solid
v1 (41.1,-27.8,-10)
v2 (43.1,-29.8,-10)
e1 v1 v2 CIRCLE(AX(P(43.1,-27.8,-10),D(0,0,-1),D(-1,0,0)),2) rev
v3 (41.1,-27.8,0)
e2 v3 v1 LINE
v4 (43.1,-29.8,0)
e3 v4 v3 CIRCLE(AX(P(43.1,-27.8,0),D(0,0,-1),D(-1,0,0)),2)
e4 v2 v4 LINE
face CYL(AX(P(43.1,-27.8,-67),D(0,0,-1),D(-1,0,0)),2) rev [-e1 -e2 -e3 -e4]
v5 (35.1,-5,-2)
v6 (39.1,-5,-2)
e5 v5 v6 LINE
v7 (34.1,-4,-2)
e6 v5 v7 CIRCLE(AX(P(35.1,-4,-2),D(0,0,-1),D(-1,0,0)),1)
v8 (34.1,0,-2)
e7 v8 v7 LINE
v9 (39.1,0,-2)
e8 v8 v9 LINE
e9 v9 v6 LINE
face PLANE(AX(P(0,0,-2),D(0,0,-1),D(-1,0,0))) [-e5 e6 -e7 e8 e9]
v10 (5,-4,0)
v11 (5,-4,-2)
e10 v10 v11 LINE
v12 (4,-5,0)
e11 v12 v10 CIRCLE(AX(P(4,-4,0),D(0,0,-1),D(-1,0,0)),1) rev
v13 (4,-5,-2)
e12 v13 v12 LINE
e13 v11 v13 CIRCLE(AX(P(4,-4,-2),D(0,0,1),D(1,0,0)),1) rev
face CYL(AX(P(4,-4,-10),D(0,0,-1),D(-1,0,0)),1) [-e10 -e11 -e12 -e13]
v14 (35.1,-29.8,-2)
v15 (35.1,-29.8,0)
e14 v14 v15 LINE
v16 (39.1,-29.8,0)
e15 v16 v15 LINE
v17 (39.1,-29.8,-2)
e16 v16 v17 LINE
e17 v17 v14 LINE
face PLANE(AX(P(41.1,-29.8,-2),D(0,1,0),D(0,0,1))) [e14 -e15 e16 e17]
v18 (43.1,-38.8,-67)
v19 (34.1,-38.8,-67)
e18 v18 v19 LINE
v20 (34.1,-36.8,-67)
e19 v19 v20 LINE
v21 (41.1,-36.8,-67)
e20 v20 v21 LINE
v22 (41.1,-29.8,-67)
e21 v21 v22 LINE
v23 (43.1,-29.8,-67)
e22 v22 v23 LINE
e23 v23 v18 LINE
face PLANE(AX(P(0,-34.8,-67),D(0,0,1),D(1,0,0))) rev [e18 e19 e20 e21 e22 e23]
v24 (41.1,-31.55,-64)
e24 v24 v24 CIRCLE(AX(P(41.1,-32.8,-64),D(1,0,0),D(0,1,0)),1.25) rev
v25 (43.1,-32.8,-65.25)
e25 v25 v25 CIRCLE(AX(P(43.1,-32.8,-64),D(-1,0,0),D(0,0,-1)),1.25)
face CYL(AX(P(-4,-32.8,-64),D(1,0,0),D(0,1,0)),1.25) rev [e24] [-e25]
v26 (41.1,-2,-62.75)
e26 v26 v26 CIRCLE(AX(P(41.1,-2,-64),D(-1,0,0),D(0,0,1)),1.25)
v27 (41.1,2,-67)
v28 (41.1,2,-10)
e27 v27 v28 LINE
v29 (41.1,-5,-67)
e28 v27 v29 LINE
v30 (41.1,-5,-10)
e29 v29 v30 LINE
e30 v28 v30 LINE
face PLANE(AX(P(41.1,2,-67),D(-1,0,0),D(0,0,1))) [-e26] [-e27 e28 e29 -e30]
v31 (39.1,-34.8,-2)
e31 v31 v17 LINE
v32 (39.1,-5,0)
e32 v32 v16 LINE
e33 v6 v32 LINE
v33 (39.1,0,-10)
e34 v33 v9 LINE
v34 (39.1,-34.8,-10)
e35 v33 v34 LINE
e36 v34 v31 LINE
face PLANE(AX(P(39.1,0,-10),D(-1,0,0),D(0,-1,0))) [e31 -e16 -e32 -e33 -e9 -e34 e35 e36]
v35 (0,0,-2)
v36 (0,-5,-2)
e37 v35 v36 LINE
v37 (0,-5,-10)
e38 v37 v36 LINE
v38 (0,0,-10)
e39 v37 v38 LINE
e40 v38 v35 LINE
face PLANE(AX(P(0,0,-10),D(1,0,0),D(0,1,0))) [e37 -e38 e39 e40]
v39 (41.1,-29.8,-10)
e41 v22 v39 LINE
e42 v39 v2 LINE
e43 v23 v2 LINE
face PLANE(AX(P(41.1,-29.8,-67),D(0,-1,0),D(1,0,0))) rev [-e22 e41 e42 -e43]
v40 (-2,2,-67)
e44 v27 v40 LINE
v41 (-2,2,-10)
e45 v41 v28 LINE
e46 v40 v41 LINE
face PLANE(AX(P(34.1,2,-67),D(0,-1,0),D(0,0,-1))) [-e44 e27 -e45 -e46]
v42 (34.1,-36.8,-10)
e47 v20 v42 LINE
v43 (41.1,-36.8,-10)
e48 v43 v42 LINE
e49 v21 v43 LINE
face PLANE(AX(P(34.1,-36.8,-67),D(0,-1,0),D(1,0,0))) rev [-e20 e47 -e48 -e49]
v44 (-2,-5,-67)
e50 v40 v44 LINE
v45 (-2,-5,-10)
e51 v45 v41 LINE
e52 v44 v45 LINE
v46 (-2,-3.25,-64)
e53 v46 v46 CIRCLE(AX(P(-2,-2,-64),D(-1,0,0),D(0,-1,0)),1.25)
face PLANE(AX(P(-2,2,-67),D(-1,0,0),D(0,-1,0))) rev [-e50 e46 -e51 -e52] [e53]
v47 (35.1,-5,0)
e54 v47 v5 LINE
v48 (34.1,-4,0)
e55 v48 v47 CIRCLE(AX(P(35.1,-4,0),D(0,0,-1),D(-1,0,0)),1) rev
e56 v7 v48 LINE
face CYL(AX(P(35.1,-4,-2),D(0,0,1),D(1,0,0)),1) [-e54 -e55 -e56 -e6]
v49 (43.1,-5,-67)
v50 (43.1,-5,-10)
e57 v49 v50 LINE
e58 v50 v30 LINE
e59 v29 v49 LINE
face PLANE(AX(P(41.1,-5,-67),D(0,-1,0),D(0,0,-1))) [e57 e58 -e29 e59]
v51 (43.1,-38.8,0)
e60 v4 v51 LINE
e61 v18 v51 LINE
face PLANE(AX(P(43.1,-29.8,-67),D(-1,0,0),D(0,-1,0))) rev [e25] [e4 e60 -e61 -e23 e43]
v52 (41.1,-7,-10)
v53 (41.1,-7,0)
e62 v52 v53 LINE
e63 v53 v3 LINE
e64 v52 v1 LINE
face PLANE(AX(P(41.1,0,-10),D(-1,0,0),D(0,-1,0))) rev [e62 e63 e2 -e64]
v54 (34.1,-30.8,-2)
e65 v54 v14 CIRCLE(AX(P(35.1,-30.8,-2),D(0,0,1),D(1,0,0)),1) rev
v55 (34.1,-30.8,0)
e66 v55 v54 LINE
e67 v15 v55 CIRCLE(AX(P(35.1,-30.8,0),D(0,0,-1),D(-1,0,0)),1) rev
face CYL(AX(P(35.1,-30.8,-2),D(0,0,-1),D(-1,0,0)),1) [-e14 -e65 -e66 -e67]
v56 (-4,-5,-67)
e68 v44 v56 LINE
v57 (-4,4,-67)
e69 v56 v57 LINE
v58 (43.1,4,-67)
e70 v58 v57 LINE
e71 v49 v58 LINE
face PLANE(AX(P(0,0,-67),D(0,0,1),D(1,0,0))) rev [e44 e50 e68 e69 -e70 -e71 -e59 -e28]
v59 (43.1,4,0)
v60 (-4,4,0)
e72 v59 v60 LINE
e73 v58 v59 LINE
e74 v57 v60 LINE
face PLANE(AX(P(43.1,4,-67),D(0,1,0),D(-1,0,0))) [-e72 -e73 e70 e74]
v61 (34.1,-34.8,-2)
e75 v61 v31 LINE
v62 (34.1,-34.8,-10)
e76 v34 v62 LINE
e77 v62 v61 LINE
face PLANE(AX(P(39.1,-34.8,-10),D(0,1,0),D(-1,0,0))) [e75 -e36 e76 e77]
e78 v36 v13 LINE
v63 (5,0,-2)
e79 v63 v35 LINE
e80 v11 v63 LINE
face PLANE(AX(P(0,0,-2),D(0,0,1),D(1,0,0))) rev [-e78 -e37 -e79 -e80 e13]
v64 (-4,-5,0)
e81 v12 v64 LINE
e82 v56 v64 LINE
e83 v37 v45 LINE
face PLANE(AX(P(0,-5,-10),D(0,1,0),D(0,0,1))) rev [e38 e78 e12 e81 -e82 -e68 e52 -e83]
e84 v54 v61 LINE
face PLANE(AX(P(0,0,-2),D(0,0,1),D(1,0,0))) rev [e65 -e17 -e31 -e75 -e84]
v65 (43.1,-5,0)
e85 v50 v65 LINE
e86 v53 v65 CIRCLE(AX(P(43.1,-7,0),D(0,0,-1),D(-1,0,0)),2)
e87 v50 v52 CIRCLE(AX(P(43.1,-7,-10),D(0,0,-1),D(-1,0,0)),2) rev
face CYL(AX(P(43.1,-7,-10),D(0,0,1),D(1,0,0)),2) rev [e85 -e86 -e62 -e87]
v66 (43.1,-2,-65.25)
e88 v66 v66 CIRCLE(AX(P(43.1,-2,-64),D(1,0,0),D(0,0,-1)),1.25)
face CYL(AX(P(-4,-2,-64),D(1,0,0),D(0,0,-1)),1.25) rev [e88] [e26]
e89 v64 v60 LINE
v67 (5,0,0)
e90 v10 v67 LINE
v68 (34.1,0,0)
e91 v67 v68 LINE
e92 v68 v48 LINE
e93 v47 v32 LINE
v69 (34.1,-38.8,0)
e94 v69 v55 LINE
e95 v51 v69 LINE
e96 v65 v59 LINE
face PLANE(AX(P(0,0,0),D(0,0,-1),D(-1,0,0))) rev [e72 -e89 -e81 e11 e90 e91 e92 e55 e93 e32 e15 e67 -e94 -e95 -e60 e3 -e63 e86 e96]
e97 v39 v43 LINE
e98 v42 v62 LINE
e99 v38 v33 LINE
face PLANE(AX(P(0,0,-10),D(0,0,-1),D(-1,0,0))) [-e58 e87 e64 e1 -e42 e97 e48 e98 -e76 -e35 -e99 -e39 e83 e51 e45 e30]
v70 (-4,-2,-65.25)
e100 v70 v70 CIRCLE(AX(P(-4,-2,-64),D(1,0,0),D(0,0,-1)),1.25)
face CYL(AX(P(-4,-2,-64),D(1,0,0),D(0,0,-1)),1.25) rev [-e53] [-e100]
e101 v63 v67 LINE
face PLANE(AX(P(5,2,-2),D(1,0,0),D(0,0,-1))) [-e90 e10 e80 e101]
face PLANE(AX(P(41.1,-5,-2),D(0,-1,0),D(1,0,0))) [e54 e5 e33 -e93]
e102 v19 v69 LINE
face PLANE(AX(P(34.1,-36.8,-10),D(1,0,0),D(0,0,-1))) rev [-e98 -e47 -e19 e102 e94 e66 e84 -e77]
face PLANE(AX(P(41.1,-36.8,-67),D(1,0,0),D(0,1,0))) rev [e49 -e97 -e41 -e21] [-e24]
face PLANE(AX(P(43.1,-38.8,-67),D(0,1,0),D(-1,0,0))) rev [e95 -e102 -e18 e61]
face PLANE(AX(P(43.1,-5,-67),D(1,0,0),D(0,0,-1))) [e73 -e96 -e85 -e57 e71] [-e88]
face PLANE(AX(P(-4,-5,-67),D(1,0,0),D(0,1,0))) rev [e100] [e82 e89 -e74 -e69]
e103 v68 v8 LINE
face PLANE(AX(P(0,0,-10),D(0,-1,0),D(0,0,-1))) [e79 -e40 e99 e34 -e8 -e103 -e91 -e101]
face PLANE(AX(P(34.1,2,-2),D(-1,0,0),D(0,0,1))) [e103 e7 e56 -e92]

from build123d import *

# Parameters (mm, degrees)
EXTRUDE_THIN1_DEPTH  = 10
SKETCH2_W            = 7
SKETCH2_H            = 7
BOSS_EXTRUDE1_DEPTH  = 2
FILLET1_R            = 1
BOSS_EXTRUDE2_DEPTH  = 67
SKETCH4_R            = 1.25
CUT_EXTRUDE1_DEPTH   = 91.624775862
FILLET2_R            = 2
MOVE_START           = -67
MOVE_FACE1_OUTLINE_W = 29.1
MOVE_FACE1_OUTLINE_H = 2
MOVE_FACE1_DEPTH     = 67


# Read off the part's stored shape, not the designer's step: Move Face1
with BuildPart() as part:
    # Sketch1 → Extrude-Thin1 (new body)
    with BuildSketch(Plane.XY):
        Polygon((0, -5), (0, 0), (39.1, 0), (39.1, -34.8), (34.1, -34.8), (34.1, -36.8), (41.1, -36.8), (41.1, 2), (-2, 2), (-2, -5), align=None)
    extrude(amount=-EXTRUDE_THIN1_DEPTH)

    # Sketch2 → Boss-Extrude1 (add)
    with BuildSketch(Plane.XY):
        with Locations((1.5, -1.5)):
            Rectangle(SKETCH2_W, SKETCH2_H)
        with Locations((37.6, -1.5)):
            Rectangle(SKETCH2_W, SKETCH2_H)
        with Locations((37.6, -33.3)):
            Rectangle(SKETCH2_W, SKETCH2_H)
    extrude(amount=-BOSS_EXTRUDE1_DEPTH)

    # Fillet1
    fillet1_edges = [part.edges().sort_by_distance(p)[0] for p in [
        (5, -5, -1),
        (34.1, -5, -1),
        (34.1, -29.8, -1),
    ]]
    fillet(fillet1_edges, radius=FILLET1_R)

    # Sketch3 → Boss-Extrude2 (add)
    with BuildSketch(Plane.XY):
        Polygon((34.1, 2), (41.1, 2), (41.1, -5), (43.1, -5), (43.1, 4), (34.1, 4), align=None)
    boss_extrude2 = extrude(amount=-BOSS_EXTRUDE2_DEPTH)

    # Mirror1: Boss-Extrude2 across plane
    add(boss_extrude2.mirror(Plane(origin=(19.55, 0, 0), x_dir=(0, 0, 1), z_dir=(1, 0, 0))))

    # Mirror2: Boss-Extrude2 across plane
    add(boss_extrude2.mirror(Plane.ZX.offset(-17.4)))

    # Sketch4 → Cut-Extrude1 (cut, through all)
    with BuildSketch(Plane(origin=(43.1, 0, 0), x_dir=(0, 0, -1), z_dir=(1, 0, 0))):
        with Locations((64, -2)):
            Circle(SKETCH4_R)
    cut_extrude1 = extrude(amount=-CUT_EXTRUDE1_DEPTH, mode=Mode.SUBTRACT)

    # Mirror3: Cut-Extrude1 across plane
    add(cut_extrude1.mirror(Plane.ZX.offset(-17.4)), mode=Mode.SUBTRACT)

    # Fillet2
    fillet2_edges = [part.edges().sort_by_distance(p)[0] for p in [
        (41.1, -29.8, -5),
        (41.1, -5, -5),
    ]]
    fillet(fillet2_edges, radius=FILLET2_R - 0.0001)  # a hair under: the kernel refuses the full size

    # Move Face1 outline → Move Face1 (add)
    with BuildSketch(Plane.XY.offset(MOVE_START)):
        with Locations((19.55, 3)):
            Rectangle(MOVE_FACE1_OUTLINE_W, MOVE_FACE1_OUTLINE_H)
    extrude(amount=MOVE_FACE1_DEPTH)


solid = part.part
